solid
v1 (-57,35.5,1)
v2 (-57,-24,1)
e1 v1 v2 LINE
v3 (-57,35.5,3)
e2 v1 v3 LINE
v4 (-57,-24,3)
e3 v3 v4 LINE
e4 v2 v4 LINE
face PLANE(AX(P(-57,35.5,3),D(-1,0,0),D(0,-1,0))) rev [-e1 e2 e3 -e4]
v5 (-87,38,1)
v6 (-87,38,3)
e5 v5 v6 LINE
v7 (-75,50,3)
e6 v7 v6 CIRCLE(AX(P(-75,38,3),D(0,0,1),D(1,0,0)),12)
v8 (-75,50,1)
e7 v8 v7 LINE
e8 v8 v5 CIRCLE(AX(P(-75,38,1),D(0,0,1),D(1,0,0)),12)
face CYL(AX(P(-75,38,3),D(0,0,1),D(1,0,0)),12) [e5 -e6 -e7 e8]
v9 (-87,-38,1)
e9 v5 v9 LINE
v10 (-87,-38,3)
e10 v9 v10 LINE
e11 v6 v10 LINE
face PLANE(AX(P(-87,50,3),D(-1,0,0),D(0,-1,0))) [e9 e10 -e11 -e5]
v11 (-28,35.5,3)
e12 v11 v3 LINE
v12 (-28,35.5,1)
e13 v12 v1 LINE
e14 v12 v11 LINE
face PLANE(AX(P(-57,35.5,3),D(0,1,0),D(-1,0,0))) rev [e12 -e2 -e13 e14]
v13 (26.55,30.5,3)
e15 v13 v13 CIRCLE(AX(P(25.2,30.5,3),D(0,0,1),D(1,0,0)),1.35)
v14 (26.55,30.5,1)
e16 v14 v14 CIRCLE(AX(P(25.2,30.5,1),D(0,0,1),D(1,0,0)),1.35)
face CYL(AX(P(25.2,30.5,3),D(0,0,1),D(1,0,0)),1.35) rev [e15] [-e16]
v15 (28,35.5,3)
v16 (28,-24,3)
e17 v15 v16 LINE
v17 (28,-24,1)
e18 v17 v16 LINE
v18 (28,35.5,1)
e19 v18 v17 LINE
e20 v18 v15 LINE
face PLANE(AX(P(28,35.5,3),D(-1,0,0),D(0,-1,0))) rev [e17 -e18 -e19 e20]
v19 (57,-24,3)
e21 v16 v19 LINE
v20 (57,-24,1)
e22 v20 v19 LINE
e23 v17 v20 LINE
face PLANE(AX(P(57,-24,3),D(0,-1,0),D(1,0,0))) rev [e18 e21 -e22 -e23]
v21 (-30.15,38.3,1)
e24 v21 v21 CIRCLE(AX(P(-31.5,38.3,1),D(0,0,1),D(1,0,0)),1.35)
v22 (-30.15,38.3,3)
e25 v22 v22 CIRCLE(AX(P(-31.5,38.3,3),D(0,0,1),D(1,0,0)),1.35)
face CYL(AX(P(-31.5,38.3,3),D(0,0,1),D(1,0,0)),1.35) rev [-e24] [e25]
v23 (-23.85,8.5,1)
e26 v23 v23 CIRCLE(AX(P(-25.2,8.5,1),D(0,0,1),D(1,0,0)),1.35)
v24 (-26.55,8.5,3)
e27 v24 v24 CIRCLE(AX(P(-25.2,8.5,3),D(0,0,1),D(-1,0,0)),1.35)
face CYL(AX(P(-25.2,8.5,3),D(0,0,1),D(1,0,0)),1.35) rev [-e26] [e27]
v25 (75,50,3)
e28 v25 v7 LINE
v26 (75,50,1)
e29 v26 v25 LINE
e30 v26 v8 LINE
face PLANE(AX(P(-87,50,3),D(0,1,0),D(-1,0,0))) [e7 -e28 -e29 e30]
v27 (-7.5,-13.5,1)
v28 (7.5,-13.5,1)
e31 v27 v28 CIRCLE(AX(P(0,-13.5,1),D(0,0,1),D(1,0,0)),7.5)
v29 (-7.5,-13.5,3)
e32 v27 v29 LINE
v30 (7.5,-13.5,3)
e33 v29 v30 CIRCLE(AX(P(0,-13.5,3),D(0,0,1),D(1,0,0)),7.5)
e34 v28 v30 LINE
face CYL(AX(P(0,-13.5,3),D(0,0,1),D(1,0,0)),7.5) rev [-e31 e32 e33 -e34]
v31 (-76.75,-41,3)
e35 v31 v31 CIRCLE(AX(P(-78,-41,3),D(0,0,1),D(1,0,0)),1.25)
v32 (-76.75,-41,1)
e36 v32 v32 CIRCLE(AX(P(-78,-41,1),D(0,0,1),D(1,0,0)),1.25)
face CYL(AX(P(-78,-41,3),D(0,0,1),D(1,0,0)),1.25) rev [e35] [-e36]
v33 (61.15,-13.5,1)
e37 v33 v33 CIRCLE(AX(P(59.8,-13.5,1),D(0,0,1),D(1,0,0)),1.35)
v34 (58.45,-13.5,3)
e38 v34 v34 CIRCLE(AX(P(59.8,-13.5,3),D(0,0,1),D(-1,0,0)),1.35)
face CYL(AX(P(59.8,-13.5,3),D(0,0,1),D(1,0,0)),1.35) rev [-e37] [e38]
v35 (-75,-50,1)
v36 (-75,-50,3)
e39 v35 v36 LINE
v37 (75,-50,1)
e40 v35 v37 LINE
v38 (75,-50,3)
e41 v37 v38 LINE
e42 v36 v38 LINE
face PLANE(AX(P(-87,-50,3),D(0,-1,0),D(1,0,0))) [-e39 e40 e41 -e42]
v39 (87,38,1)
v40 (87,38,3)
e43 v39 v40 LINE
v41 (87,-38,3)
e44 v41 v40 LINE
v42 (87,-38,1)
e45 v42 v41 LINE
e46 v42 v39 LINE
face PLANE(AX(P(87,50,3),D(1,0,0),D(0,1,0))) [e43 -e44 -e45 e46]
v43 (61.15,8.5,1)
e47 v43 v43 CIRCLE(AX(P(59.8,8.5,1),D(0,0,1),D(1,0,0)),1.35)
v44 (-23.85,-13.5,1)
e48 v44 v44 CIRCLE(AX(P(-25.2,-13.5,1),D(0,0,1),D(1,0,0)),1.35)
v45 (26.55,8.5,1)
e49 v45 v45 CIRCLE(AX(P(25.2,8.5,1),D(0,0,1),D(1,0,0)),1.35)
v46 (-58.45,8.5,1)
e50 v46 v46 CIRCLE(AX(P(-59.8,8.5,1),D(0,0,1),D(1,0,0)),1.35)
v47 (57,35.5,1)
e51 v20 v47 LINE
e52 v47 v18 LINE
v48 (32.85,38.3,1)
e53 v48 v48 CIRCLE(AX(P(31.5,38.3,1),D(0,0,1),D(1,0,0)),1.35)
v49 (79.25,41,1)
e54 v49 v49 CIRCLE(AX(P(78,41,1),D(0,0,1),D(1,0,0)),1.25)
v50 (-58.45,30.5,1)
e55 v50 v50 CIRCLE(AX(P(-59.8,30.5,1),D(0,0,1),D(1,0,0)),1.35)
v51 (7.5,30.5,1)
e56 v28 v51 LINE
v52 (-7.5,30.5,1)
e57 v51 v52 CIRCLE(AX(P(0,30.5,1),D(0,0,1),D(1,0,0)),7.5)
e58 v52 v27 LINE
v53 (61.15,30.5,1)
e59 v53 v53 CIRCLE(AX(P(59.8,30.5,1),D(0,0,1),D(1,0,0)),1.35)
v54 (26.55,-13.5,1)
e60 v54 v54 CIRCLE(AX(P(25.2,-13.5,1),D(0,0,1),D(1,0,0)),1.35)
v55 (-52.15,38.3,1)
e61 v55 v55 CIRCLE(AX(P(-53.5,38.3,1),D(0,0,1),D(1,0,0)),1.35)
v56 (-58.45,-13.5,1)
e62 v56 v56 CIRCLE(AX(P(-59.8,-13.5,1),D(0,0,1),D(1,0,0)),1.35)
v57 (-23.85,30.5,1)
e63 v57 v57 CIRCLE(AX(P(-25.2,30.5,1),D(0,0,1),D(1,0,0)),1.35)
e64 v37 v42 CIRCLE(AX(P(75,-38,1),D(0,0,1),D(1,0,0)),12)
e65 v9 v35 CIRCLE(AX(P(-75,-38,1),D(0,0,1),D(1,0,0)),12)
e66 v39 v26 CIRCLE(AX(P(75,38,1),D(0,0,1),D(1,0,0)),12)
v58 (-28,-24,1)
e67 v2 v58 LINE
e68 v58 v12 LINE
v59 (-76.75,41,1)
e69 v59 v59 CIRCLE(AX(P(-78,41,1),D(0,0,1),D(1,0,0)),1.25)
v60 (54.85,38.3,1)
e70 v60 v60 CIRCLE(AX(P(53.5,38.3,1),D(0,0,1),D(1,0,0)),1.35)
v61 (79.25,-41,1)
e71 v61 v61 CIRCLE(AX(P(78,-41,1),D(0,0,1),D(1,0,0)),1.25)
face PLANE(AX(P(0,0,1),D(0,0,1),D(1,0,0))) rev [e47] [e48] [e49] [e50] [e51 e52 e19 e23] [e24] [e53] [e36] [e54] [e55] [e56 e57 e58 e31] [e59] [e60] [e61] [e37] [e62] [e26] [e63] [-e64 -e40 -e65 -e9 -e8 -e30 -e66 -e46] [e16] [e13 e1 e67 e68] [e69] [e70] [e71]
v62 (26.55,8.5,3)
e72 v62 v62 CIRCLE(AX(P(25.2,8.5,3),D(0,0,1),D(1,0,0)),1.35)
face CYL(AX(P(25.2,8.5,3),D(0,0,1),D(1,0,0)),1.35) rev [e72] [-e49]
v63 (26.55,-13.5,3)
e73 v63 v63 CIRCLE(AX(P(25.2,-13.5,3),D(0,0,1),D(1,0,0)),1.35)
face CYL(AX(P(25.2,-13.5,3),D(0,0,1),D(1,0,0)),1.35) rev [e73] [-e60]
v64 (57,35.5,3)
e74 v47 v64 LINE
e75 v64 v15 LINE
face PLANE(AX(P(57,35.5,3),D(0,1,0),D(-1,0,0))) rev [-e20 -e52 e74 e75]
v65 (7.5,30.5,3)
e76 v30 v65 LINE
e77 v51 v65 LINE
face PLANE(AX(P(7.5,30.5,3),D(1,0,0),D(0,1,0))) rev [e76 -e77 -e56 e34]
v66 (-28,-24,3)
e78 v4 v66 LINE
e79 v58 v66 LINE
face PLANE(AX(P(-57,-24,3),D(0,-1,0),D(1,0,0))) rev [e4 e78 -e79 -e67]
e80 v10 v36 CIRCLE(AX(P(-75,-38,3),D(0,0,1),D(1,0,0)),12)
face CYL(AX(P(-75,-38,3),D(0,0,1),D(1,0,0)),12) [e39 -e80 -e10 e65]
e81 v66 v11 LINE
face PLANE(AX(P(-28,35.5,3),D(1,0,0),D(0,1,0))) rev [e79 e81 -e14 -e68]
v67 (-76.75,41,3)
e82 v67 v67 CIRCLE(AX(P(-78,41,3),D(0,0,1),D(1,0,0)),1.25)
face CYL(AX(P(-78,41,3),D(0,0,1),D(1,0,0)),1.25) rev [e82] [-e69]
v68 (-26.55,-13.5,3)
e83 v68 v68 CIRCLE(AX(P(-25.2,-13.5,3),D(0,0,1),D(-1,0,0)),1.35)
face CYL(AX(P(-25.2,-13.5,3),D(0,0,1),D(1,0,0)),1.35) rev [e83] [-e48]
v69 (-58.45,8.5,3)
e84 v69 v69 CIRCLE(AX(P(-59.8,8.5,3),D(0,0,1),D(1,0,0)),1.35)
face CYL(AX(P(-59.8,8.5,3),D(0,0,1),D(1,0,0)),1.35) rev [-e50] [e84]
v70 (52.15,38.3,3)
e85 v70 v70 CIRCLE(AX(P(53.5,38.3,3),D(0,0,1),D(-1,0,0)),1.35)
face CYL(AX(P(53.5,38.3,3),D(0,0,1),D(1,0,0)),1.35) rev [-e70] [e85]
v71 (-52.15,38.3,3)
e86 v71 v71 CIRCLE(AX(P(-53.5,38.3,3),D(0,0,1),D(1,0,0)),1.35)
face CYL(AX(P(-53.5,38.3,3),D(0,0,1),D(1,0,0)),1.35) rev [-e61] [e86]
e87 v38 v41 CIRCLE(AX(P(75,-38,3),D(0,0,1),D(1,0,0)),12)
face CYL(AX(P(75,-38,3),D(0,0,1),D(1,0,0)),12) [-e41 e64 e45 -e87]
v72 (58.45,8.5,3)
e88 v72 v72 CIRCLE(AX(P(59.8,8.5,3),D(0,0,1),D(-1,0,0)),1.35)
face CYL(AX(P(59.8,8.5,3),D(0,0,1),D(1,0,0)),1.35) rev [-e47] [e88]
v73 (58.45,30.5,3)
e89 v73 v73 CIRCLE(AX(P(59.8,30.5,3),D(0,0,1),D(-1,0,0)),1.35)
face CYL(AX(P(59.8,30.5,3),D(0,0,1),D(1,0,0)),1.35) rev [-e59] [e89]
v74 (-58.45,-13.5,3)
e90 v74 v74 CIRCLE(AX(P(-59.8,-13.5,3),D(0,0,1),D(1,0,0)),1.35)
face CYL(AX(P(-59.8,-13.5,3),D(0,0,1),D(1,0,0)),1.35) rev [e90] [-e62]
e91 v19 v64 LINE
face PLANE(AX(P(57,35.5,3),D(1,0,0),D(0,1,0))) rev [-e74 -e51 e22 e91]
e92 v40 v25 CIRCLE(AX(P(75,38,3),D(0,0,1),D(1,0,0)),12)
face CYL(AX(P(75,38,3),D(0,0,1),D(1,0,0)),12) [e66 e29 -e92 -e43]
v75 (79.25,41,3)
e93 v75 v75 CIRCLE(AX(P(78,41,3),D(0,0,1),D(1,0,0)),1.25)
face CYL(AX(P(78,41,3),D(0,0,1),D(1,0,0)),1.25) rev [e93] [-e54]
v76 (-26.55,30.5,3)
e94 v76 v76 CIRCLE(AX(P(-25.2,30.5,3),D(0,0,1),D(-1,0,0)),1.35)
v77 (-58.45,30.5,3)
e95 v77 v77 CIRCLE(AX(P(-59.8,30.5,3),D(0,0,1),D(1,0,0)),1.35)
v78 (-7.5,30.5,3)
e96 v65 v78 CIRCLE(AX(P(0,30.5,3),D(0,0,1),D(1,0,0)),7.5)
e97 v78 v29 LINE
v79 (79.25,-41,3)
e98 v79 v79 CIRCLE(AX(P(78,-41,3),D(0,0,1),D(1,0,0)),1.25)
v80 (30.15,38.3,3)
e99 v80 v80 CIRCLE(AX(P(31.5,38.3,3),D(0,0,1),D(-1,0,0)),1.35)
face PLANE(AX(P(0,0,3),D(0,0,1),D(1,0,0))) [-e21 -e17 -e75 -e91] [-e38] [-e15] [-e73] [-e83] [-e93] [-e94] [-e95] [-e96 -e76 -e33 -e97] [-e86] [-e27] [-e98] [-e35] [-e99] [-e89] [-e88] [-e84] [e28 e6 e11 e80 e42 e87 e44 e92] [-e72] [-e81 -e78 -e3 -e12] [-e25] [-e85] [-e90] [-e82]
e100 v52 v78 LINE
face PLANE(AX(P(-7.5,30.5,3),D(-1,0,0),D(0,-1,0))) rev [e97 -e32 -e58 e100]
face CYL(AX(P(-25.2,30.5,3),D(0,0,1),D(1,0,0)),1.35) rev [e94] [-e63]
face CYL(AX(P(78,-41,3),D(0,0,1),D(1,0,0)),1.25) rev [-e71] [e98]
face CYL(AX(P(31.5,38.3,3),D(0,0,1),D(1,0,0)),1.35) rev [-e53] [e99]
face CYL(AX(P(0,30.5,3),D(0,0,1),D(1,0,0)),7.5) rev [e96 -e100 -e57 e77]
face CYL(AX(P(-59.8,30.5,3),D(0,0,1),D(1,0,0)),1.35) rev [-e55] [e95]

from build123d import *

# Parameters (mm, degrees)
ESBO_O1_W                     = 174
ESBO_O1_H                     = 100
ESBO_O1_R                     = 1.25
RESSALTO_EXTRUS_O1_DEPTH      = 3
FILETE1_R                     = 12
ESBO_O2_R                     = 1.35
ESBO_O2_W                     = 29
ESBO_O2_H                     = 59.5
CORTE_EXTRUS_O1_DEPTH         = 10
CONVERTER_S_LIDO1_OUTLINE_R   = 1.25
CONVERTER_S_LIDO1_OUTLINE_R_2 = 1.35
CONVERTER_S_LIDO1_OUTLINE_W   = 29
CONVERTER_S_LIDO1_OUTLINE_H   = 59.5
CONVERTER_S_LIDO1_DEPTH       = 1


# Read off the part's stored shape, not the designer's step: Converter-Sólido1
with BuildPart() as part:
    # Esboço1 → Ressalto-extrusão1 (new body)
    with BuildSketch(Plane.XY):
        Rectangle(ESBO_O1_W, ESBO_O1_H)
        with Locations((-78, -41)):
            Circle(ESBO_O1_R, mode=Mode.SUBTRACT)
        with Locations((-78, 41)):
            Circle(ESBO_O1_R, mode=Mode.SUBTRACT)
        with Locations((78, 41)):
            Circle(ESBO_O1_R, mode=Mode.SUBTRACT)
        with Locations((78, -41)):
            Circle(ESBO_O1_R, mode=Mode.SUBTRACT)
    extrude(amount=RESSALTO_EXTRUS_O1_DEPTH)

    # Filete1
    filete1_edges = [part.edges().sort_by_distance(p)[0] for p in [
        (87, -50, 1.5),
        (-87, -50, 1.5),
        (-87, 50, 1.5),
        (87, 50, 1.5),
    ]]
    fillet(filete1_edges, radius=FILETE1_R)

    # Esboço2 → Corte-extrusão1 (cut)
    with BuildSketch(Plane.XY.offset(3)):
        with Locations((-59.8, 30.5)):
            Circle(ESBO_O2_R)
        with Locations((-59.8, 8.5)):
            Circle(ESBO_O2_R)
        with Locations((-59.8, -13.5)):
            Circle(ESBO_O2_R)
        with Locations((-25.2, -13.5)):
            Circle(ESBO_O2_R)
        with Locations((-25.2, 8.5)):
            Circle(ESBO_O2_R)
        with Locations((-25.2, 30.5)):
            Circle(ESBO_O2_R)
        with Locations((-53.5, 38.3)):
            Circle(ESBO_O2_R)
        with Locations((-31.5, 38.3)):
            Circle(ESBO_O2_R)
        with Locations((31.5, 38.3)):
            Circle(ESBO_O2_R)
        with Locations((53.5, 38.3)):
            Circle(ESBO_O2_R)
        with Locations((25.2, 30.5)):
            Circle(ESBO_O2_R)
        with Locations((25.2, 8.5)):
            Circle(ESBO_O2_R)
        with Locations((25.2, -13.5)):
            Circle(ESBO_O2_R)
        with Locations((59.8, -13.5)):
            Circle(ESBO_O2_R)
        with Locations((59.8, 8.5)):
            Circle(ESBO_O2_R)
        with Locations((59.8, 30.5)):
            Circle(ESBO_O2_R)
        with Locations((-42.5, 5.75)):
            Rectangle(ESBO_O2_W, ESBO_O2_H)
        with Locations((42.5, 5.75)):
            Rectangle(ESBO_O2_W, ESBO_O2_H)
        with BuildLine():
            Line((7.5, 30.5), (7.5, -13.5))
            ThreePointArc((7.5, -13.5), (0, -21), (-7.5, -13.5))
            Line((-7.5, -13.5), (-7.5, 30.5))
            ThreePointArc((-7.5, 30.5), (0, 38), (7.5, 30.5))
        make_face()
    extrude(amount=-CORTE_EXTRUS_O1_DEPTH, mode=Mode.SUBTRACT)

    # Converter-Sólido1 outline → Converter-Sólido1 (cut)
    with BuildSketch(Plane.XY):
        with BuildLine():
            Line((87, -38), (87, 38))
            ThreePointArc((87, 38), (83.485281374, 46.485281374), (75, 50))
            Line((75, 50), (-75, 50))
            ThreePointArc((-75, 50), (-83.485281374, 46.485281374), (-87, 38))
            Line((-87, 38), (-87, -38))
            ThreePointArc((-87, -38), (-83.485281374, -46.485281374), (-75, -50))
            Line((-75, -50), (75, -50))
            ThreePointArc((75, -50), (83.485281374, -46.485281374), (87, -38))
        make_face()
        with Locations((-78, -41)):
            Circle(CONVERTER_S_LIDO1_OUTLINE_R, mode=Mode.SUBTRACT)
        with Locations((-59.8, -13.5)):
            Circle(CONVERTER_S_LIDO1_OUTLINE_R_2, mode=Mode.SUBTRACT)
        with Locations((-25.2, -13.5)):
            Circle(CONVERTER_S_LIDO1_OUTLINE_R_2, mode=Mode.SUBTRACT)
        with Locations((78, -41)):
            Circle(CONVERTER_S_LIDO1_OUTLINE_R, mode=Mode.SUBTRACT)
        with Locations((25.2, -13.5)):
            Circle(CONVERTER_S_LIDO1_OUTLINE_R_2, mode=Mode.SUBTRACT)
        with Locations((59.8, -13.5)):
            Circle(CONVERTER_S_LIDO1_OUTLINE_R_2, mode=Mode.SUBTRACT)
        with Locations((-59.8, 8.5)):
            Circle(CONVERTER_S_LIDO1_OUTLINE_R_2, mode=Mode.SUBTRACT)
        with Locations((-42.5, 5.75)):
            Rectangle(CONVERTER_S_LIDO1_OUTLINE_W, CONVERTER_S_LIDO1_OUTLINE_H, mode=Mode.SUBTRACT)
        with Locations((-25.2, 8.5)):
            Circle(CONVERTER_S_LIDO1_OUTLINE_R_2, mode=Mode.SUBTRACT)
        with Locations((-59.8, 30.5)):
            Circle(CONVERTER_S_LIDO1_OUTLINE_R_2, mode=Mode.SUBTRACT)
        with Locations((-78, 41)):
            Circle(CONVERTER_S_LIDO1_OUTLINE_R, mode=Mode.SUBTRACT)
        with Locations((-53.5, 38.3)):
            Circle(CONVERTER_S_LIDO1_OUTLINE_R_2, mode=Mode.SUBTRACT)
        with Locations((-25.2, 30.5)):
            Circle(CONVERTER_S_LIDO1_OUTLINE_R_2, mode=Mode.SUBTRACT)
        with Locations((-31.5, 38.3)):
            Circle(CONVERTER_S_LIDO1_OUTLINE_R_2, mode=Mode.SUBTRACT)
        with BuildLine():
            ThreePointArc((-7.5, 30.5), (0, 38), (7.5, 30.5))
            Line((7.5, 30.5), (7.5, -13.5))
            ThreePointArc((7.5, -13.5), (0, -21), (-7.5, -13.5))
            Line((-7.5, -13.5), (-7.5, 30.5))
        make_face(mode=Mode.SUBTRACT)
        with Locations((42.5, 5.75)):
            Rectangle(CONVERTER_S_LIDO1_OUTLINE_W, CONVERTER_S_LIDO1_OUTLINE_H, mode=Mode.SUBTRACT)
        with Locations((25.2, 8.5)):
            Circle(CONVERTER_S_LIDO1_OUTLINE_R_2, mode=Mode.SUBTRACT)
        with Locations((59.8, 8.5)):
            Circle(CONVERTER_S_LIDO1_OUTLINE_R_2, mode=Mode.SUBTRACT)
        with Locations((25.2, 30.5)):
            Circle(CONVERTER_S_LIDO1_OUTLINE_R_2, mode=Mode.SUBTRACT)
        with Locations((31.5, 38.3)):
            Circle(CONVERTER_S_LIDO1_OUTLINE_R_2, mode=Mode.SUBTRACT)
        with Locations((59.8, 30.5)):
            Circle(CONVERTER_S_LIDO1_OUTLINE_R_2, mode=Mode.SUBTRACT)
        with Locations((53.5, 38.3)):
            Circle(CONVERTER_S_LIDO1_OUTLINE_R_2, mode=Mode.SUBTRACT)
        with Locations((78, 41)):
            Circle(CONVERTER_S_LIDO1_OUTLINE_R, mode=Mode.SUBTRACT)
    extrude(amount=CONVERTER_S_LIDO1_DEPTH, mode=Mode.SUBTRACT)


solid = part.part
